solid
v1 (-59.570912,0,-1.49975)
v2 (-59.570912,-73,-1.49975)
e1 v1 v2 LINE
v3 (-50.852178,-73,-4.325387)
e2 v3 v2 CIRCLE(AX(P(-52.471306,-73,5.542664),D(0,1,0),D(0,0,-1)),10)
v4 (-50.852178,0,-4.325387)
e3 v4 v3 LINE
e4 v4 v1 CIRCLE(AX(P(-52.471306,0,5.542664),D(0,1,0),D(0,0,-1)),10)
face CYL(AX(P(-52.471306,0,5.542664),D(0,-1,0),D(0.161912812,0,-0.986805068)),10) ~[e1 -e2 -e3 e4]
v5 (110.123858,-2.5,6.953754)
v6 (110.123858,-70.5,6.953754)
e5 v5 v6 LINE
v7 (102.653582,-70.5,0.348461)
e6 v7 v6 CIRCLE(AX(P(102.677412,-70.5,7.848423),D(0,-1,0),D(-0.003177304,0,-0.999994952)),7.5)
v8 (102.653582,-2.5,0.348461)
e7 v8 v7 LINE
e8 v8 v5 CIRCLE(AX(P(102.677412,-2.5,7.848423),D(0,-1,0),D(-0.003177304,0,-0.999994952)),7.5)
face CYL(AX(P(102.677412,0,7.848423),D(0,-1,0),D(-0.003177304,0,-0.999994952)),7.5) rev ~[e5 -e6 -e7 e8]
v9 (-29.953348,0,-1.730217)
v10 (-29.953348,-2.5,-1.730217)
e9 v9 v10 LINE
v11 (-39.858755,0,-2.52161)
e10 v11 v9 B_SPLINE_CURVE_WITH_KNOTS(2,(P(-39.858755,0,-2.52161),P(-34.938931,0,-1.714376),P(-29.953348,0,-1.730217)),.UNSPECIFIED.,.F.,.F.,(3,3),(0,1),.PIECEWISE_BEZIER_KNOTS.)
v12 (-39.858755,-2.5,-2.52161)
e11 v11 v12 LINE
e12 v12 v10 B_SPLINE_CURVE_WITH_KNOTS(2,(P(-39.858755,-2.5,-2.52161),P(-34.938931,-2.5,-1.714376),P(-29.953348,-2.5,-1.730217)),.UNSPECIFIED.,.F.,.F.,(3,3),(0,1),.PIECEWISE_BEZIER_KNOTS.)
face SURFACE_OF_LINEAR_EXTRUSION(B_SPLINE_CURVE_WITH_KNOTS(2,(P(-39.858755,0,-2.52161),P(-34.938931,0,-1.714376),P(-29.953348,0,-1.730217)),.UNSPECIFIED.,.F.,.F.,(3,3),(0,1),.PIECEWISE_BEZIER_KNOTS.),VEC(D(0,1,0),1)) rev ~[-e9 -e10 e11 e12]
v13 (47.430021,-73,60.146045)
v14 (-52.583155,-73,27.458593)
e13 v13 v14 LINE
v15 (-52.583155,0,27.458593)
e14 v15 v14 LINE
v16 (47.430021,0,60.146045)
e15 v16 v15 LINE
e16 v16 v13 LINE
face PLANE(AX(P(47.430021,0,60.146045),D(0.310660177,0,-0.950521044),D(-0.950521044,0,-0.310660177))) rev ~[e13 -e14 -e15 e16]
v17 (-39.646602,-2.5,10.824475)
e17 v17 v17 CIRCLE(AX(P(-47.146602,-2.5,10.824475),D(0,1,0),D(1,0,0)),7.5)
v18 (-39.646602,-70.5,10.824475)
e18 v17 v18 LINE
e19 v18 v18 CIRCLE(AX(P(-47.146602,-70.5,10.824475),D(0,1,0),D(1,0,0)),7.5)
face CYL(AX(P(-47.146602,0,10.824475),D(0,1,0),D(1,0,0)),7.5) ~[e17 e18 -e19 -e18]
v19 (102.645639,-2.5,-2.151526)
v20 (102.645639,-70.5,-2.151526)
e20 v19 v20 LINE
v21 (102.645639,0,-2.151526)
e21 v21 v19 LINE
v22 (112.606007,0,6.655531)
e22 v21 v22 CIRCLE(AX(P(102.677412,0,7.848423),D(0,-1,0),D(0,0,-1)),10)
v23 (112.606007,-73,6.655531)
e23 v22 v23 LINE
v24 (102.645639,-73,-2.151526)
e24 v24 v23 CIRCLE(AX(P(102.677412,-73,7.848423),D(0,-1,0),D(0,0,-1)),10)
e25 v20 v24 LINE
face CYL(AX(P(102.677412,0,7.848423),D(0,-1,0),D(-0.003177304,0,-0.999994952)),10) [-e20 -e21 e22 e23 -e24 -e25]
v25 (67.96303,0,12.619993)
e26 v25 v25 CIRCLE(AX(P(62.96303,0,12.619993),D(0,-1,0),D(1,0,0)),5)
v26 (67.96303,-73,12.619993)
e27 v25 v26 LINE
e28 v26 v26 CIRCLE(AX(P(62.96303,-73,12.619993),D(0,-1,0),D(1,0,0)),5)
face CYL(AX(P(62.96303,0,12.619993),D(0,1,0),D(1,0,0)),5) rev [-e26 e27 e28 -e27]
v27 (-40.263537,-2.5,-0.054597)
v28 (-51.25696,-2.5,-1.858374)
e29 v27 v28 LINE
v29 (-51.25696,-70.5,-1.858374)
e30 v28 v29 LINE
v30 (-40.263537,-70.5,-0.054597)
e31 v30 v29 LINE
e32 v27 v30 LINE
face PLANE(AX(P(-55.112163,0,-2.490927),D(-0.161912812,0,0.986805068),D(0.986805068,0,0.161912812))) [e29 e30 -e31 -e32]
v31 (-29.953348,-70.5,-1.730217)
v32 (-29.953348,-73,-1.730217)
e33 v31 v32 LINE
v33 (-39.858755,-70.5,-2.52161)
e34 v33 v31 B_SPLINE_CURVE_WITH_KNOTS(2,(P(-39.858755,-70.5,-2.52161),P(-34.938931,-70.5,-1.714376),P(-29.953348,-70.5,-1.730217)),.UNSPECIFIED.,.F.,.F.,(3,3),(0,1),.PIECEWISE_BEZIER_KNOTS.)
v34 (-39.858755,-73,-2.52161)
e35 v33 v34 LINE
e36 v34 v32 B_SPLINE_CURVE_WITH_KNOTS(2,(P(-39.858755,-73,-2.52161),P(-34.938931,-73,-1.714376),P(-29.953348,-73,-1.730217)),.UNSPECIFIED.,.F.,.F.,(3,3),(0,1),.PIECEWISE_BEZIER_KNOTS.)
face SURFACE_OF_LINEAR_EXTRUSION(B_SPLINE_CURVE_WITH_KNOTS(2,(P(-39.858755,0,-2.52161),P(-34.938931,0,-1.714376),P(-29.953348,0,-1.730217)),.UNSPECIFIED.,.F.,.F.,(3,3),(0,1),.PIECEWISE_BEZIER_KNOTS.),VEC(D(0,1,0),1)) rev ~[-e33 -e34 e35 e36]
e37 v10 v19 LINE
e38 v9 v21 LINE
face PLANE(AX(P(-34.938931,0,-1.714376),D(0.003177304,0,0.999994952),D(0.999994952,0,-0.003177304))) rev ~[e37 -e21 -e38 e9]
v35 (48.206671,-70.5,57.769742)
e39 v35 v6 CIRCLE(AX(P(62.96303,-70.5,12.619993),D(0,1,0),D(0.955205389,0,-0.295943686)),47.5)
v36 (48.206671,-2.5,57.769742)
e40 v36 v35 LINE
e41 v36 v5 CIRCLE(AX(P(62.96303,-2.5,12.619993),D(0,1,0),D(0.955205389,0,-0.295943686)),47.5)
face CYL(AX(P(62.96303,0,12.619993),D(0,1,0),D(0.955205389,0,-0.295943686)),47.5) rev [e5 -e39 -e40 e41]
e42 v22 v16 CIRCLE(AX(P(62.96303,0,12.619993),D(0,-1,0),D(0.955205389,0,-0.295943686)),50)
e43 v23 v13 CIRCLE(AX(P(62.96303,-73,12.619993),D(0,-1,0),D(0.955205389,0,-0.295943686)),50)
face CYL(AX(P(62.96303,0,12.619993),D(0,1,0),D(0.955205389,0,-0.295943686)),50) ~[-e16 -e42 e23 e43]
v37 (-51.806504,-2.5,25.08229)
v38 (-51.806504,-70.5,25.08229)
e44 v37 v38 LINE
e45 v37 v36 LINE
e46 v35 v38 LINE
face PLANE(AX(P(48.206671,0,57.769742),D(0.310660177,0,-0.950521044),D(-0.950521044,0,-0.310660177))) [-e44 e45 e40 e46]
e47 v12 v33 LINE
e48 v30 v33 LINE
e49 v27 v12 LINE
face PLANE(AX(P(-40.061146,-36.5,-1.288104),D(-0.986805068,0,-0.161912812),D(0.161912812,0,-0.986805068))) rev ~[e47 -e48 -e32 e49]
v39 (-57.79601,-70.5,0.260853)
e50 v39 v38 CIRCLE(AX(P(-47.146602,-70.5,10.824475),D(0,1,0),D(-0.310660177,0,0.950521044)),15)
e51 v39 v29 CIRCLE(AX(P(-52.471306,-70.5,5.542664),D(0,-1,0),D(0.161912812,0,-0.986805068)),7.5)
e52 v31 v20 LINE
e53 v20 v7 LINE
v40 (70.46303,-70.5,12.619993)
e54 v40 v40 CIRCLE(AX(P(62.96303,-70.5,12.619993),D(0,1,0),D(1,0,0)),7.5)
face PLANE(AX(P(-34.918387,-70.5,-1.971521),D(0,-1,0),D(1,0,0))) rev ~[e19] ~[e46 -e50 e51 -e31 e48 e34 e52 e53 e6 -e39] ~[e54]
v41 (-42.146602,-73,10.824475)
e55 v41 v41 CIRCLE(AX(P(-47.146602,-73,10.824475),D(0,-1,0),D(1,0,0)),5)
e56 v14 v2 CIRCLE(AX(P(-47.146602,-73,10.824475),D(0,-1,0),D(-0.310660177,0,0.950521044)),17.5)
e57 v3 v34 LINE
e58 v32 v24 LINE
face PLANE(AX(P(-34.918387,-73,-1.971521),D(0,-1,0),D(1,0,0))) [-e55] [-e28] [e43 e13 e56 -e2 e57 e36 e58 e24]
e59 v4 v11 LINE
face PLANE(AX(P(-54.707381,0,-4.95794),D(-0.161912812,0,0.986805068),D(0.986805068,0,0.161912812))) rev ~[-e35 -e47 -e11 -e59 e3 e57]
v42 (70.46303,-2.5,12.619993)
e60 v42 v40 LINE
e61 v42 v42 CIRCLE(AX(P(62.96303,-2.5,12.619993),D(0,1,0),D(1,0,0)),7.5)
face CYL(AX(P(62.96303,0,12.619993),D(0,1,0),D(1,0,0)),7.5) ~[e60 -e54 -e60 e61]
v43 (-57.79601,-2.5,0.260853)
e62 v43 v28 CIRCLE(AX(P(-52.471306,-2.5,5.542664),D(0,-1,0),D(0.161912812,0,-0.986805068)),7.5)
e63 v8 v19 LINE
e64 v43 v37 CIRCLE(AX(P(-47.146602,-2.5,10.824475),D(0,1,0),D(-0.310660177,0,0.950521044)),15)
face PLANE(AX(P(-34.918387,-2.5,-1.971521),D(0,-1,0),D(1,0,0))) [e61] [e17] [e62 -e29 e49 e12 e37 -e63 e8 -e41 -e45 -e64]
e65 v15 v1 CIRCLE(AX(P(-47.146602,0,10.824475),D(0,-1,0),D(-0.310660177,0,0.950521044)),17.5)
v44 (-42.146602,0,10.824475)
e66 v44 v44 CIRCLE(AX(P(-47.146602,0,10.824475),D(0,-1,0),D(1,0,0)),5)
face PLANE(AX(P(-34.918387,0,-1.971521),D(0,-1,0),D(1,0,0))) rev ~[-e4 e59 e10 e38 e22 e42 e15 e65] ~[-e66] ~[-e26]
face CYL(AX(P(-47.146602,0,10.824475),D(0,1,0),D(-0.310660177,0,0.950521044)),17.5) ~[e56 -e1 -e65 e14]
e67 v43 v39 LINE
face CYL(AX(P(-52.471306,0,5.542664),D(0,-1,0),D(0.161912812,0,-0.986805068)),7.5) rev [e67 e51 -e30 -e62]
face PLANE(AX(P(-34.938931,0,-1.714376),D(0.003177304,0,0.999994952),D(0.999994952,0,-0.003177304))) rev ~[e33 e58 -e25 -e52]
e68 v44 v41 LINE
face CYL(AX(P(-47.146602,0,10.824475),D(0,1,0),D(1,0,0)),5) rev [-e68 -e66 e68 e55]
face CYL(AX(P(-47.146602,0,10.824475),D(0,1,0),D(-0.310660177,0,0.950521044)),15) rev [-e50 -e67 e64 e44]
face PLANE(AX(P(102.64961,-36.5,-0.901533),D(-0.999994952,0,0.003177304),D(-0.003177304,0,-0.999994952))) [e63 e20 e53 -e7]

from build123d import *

# Parameters (mm, degrees)
F0_R        = 5
F1_DEPTH    = 73
F2_T1_DEPTH = 73
F3_R        = 10
F4_T        = 2.5


# Not quite as in the source:
# - a fillet or chamfer that OpenCascade refuses, or shapes differently, is made with other operations: its cross-section is extruded or revolved along the edge and cut away or added
# - a shell that OpenCascade refuses in one call is made with other operations: the cavity is built on its own and cut out


with BuildPart() as f1:
    # F0 (on Front) → F1 (new body)
    with BuildSketch(Plane.XZ):
        with BuildLine():
            Line((105.4664104798, -2.1604888337), (110.723299262, -2.1771916507))
            ThreePointArc((110.723299262, -2.1771916507), (98.0443002081, 48.2472921113), (47.4300209604, 60.1460448152))
            Line((47.4300209604, 60.1460448152), (-52.5831548864, 27.4585928761))
            ThreePointArc((-52.5831548864, 27.4585928761), (-64.6091493054, 11.9687796957), (-54.7073812284, -4.9579401011))
            Line((-54.7073812284, -4.9579401011), (-34.93893119, -1.7143761565))
            Line((-34.93893119, -1.7143761565), (20.3665836392, -1.8900994658))
            ThreePointArc((20.3665836392, -1.8900994658), (55.6091219512, 57.015037844), (107.9630298197, 12.6199926356))
            ThreePointArc((107.9630298197, 12.6199926356), (107.3344853384, 5.1250653412), (105.4664104798, -2.1604888337))
        make_face()
        with Locations((-47.1466017857, 10.8244746133)):
            Circle(F0_R, mode=Mode.SUBTRACT)
        with BuildLine():
            Line((20.3665836392, -1.8900994658), (105.4664104798, -2.1604888337))
            ThreePointArc((105.4664104798, -2.1604888337), (107.3344853384, 5.1250653412), (107.9630298197, 12.6199926356))
            ThreePointArc((107.9630298197, 12.6199926356), (55.6091219512, 57.015037844), (20.3665836392, -1.8900994658))
        make_face()
        with Locations((62.9630298197, 12.6199926356)):
            Circle(F0_R, mode=Mode.SUBTRACT)
    extrude(amount=F1_DEPTH)

    # F2: fillet of radius 60 on 1 edges, made by hand

    # F2_s2 → F2_t1 (join)
    with BuildSketch(Plane.XZ):
        with BuildLine():
            add(Edge.make_bspline(
                [(-39.8587548674, -2.52161004), (-34.93893119, -1.7143761565), (-29.9533479112, -1.7302169492)],
                knots=[0, 0, 0, 1, 1, 1], degree=2, weights=[1, 1, 1]))
            Line((-29.9533479112, -1.7302169492), (-34.93893119, -1.7143761565))
            Line((-34.93893119, -1.7143761565), (-39.8587548674, -2.52161004))
        make_face()
    extrude(amount=F2_T1_DEPTH)

    # F3
    f3_edges = [f1.edges().sort_by_distance(p)[0] for p in [
        (110.723299, -36.5, -2.177192),
        (-54.707381, -36.5, -4.95794),
    ]]
    fillet(f3_edges, radius=F3_R)

    # F4: shell of thickness 2.5, made by hand


with BuildPart() as f4_core1:
    # F4_t2: copy of F1
    add(f1.part)

    # the walls: a layer under each face that stays
    f4_faces = [f4_core1.faces().sort_by_distance(p)[0] for p in [
        (94.683390136, -36.5, 51.2699440121),
        (24.158214017, 0, 29.0813282585),
        (109.3014464934, -36.5, 0.3569505301),
        (-2.576566963, -36.5, 43.8023188457),
        (24.158214017, -73, 29.0813282585),
        (-64.1583335829, -36.5, 14.9294692855),
        (-55.554318165, -36.5, -3.9702240205),
        (-45.3554663929, -36.5, -3.4234984168),
        (-52.1466017857, -36.5, 10.8244746133),
        (57.9630298197, -36.5, 12.6199926356),
    ]]
    thicken(f4_faces, amount=-F4_T, mode=Mode.SUBTRACT)


with BuildPart() as f1_1:
    add(f1.part)

    # what is left inside the walls is the cavity
    f4_cavity = [f4_core1.part.solids().sort_by_distance(p)[0] for p in [
        (36.346225, -47.833333, -1.915872),
    ]]
    add(f4_cavity, mode=Mode.SUBTRACT)


solid = f1_1.part
